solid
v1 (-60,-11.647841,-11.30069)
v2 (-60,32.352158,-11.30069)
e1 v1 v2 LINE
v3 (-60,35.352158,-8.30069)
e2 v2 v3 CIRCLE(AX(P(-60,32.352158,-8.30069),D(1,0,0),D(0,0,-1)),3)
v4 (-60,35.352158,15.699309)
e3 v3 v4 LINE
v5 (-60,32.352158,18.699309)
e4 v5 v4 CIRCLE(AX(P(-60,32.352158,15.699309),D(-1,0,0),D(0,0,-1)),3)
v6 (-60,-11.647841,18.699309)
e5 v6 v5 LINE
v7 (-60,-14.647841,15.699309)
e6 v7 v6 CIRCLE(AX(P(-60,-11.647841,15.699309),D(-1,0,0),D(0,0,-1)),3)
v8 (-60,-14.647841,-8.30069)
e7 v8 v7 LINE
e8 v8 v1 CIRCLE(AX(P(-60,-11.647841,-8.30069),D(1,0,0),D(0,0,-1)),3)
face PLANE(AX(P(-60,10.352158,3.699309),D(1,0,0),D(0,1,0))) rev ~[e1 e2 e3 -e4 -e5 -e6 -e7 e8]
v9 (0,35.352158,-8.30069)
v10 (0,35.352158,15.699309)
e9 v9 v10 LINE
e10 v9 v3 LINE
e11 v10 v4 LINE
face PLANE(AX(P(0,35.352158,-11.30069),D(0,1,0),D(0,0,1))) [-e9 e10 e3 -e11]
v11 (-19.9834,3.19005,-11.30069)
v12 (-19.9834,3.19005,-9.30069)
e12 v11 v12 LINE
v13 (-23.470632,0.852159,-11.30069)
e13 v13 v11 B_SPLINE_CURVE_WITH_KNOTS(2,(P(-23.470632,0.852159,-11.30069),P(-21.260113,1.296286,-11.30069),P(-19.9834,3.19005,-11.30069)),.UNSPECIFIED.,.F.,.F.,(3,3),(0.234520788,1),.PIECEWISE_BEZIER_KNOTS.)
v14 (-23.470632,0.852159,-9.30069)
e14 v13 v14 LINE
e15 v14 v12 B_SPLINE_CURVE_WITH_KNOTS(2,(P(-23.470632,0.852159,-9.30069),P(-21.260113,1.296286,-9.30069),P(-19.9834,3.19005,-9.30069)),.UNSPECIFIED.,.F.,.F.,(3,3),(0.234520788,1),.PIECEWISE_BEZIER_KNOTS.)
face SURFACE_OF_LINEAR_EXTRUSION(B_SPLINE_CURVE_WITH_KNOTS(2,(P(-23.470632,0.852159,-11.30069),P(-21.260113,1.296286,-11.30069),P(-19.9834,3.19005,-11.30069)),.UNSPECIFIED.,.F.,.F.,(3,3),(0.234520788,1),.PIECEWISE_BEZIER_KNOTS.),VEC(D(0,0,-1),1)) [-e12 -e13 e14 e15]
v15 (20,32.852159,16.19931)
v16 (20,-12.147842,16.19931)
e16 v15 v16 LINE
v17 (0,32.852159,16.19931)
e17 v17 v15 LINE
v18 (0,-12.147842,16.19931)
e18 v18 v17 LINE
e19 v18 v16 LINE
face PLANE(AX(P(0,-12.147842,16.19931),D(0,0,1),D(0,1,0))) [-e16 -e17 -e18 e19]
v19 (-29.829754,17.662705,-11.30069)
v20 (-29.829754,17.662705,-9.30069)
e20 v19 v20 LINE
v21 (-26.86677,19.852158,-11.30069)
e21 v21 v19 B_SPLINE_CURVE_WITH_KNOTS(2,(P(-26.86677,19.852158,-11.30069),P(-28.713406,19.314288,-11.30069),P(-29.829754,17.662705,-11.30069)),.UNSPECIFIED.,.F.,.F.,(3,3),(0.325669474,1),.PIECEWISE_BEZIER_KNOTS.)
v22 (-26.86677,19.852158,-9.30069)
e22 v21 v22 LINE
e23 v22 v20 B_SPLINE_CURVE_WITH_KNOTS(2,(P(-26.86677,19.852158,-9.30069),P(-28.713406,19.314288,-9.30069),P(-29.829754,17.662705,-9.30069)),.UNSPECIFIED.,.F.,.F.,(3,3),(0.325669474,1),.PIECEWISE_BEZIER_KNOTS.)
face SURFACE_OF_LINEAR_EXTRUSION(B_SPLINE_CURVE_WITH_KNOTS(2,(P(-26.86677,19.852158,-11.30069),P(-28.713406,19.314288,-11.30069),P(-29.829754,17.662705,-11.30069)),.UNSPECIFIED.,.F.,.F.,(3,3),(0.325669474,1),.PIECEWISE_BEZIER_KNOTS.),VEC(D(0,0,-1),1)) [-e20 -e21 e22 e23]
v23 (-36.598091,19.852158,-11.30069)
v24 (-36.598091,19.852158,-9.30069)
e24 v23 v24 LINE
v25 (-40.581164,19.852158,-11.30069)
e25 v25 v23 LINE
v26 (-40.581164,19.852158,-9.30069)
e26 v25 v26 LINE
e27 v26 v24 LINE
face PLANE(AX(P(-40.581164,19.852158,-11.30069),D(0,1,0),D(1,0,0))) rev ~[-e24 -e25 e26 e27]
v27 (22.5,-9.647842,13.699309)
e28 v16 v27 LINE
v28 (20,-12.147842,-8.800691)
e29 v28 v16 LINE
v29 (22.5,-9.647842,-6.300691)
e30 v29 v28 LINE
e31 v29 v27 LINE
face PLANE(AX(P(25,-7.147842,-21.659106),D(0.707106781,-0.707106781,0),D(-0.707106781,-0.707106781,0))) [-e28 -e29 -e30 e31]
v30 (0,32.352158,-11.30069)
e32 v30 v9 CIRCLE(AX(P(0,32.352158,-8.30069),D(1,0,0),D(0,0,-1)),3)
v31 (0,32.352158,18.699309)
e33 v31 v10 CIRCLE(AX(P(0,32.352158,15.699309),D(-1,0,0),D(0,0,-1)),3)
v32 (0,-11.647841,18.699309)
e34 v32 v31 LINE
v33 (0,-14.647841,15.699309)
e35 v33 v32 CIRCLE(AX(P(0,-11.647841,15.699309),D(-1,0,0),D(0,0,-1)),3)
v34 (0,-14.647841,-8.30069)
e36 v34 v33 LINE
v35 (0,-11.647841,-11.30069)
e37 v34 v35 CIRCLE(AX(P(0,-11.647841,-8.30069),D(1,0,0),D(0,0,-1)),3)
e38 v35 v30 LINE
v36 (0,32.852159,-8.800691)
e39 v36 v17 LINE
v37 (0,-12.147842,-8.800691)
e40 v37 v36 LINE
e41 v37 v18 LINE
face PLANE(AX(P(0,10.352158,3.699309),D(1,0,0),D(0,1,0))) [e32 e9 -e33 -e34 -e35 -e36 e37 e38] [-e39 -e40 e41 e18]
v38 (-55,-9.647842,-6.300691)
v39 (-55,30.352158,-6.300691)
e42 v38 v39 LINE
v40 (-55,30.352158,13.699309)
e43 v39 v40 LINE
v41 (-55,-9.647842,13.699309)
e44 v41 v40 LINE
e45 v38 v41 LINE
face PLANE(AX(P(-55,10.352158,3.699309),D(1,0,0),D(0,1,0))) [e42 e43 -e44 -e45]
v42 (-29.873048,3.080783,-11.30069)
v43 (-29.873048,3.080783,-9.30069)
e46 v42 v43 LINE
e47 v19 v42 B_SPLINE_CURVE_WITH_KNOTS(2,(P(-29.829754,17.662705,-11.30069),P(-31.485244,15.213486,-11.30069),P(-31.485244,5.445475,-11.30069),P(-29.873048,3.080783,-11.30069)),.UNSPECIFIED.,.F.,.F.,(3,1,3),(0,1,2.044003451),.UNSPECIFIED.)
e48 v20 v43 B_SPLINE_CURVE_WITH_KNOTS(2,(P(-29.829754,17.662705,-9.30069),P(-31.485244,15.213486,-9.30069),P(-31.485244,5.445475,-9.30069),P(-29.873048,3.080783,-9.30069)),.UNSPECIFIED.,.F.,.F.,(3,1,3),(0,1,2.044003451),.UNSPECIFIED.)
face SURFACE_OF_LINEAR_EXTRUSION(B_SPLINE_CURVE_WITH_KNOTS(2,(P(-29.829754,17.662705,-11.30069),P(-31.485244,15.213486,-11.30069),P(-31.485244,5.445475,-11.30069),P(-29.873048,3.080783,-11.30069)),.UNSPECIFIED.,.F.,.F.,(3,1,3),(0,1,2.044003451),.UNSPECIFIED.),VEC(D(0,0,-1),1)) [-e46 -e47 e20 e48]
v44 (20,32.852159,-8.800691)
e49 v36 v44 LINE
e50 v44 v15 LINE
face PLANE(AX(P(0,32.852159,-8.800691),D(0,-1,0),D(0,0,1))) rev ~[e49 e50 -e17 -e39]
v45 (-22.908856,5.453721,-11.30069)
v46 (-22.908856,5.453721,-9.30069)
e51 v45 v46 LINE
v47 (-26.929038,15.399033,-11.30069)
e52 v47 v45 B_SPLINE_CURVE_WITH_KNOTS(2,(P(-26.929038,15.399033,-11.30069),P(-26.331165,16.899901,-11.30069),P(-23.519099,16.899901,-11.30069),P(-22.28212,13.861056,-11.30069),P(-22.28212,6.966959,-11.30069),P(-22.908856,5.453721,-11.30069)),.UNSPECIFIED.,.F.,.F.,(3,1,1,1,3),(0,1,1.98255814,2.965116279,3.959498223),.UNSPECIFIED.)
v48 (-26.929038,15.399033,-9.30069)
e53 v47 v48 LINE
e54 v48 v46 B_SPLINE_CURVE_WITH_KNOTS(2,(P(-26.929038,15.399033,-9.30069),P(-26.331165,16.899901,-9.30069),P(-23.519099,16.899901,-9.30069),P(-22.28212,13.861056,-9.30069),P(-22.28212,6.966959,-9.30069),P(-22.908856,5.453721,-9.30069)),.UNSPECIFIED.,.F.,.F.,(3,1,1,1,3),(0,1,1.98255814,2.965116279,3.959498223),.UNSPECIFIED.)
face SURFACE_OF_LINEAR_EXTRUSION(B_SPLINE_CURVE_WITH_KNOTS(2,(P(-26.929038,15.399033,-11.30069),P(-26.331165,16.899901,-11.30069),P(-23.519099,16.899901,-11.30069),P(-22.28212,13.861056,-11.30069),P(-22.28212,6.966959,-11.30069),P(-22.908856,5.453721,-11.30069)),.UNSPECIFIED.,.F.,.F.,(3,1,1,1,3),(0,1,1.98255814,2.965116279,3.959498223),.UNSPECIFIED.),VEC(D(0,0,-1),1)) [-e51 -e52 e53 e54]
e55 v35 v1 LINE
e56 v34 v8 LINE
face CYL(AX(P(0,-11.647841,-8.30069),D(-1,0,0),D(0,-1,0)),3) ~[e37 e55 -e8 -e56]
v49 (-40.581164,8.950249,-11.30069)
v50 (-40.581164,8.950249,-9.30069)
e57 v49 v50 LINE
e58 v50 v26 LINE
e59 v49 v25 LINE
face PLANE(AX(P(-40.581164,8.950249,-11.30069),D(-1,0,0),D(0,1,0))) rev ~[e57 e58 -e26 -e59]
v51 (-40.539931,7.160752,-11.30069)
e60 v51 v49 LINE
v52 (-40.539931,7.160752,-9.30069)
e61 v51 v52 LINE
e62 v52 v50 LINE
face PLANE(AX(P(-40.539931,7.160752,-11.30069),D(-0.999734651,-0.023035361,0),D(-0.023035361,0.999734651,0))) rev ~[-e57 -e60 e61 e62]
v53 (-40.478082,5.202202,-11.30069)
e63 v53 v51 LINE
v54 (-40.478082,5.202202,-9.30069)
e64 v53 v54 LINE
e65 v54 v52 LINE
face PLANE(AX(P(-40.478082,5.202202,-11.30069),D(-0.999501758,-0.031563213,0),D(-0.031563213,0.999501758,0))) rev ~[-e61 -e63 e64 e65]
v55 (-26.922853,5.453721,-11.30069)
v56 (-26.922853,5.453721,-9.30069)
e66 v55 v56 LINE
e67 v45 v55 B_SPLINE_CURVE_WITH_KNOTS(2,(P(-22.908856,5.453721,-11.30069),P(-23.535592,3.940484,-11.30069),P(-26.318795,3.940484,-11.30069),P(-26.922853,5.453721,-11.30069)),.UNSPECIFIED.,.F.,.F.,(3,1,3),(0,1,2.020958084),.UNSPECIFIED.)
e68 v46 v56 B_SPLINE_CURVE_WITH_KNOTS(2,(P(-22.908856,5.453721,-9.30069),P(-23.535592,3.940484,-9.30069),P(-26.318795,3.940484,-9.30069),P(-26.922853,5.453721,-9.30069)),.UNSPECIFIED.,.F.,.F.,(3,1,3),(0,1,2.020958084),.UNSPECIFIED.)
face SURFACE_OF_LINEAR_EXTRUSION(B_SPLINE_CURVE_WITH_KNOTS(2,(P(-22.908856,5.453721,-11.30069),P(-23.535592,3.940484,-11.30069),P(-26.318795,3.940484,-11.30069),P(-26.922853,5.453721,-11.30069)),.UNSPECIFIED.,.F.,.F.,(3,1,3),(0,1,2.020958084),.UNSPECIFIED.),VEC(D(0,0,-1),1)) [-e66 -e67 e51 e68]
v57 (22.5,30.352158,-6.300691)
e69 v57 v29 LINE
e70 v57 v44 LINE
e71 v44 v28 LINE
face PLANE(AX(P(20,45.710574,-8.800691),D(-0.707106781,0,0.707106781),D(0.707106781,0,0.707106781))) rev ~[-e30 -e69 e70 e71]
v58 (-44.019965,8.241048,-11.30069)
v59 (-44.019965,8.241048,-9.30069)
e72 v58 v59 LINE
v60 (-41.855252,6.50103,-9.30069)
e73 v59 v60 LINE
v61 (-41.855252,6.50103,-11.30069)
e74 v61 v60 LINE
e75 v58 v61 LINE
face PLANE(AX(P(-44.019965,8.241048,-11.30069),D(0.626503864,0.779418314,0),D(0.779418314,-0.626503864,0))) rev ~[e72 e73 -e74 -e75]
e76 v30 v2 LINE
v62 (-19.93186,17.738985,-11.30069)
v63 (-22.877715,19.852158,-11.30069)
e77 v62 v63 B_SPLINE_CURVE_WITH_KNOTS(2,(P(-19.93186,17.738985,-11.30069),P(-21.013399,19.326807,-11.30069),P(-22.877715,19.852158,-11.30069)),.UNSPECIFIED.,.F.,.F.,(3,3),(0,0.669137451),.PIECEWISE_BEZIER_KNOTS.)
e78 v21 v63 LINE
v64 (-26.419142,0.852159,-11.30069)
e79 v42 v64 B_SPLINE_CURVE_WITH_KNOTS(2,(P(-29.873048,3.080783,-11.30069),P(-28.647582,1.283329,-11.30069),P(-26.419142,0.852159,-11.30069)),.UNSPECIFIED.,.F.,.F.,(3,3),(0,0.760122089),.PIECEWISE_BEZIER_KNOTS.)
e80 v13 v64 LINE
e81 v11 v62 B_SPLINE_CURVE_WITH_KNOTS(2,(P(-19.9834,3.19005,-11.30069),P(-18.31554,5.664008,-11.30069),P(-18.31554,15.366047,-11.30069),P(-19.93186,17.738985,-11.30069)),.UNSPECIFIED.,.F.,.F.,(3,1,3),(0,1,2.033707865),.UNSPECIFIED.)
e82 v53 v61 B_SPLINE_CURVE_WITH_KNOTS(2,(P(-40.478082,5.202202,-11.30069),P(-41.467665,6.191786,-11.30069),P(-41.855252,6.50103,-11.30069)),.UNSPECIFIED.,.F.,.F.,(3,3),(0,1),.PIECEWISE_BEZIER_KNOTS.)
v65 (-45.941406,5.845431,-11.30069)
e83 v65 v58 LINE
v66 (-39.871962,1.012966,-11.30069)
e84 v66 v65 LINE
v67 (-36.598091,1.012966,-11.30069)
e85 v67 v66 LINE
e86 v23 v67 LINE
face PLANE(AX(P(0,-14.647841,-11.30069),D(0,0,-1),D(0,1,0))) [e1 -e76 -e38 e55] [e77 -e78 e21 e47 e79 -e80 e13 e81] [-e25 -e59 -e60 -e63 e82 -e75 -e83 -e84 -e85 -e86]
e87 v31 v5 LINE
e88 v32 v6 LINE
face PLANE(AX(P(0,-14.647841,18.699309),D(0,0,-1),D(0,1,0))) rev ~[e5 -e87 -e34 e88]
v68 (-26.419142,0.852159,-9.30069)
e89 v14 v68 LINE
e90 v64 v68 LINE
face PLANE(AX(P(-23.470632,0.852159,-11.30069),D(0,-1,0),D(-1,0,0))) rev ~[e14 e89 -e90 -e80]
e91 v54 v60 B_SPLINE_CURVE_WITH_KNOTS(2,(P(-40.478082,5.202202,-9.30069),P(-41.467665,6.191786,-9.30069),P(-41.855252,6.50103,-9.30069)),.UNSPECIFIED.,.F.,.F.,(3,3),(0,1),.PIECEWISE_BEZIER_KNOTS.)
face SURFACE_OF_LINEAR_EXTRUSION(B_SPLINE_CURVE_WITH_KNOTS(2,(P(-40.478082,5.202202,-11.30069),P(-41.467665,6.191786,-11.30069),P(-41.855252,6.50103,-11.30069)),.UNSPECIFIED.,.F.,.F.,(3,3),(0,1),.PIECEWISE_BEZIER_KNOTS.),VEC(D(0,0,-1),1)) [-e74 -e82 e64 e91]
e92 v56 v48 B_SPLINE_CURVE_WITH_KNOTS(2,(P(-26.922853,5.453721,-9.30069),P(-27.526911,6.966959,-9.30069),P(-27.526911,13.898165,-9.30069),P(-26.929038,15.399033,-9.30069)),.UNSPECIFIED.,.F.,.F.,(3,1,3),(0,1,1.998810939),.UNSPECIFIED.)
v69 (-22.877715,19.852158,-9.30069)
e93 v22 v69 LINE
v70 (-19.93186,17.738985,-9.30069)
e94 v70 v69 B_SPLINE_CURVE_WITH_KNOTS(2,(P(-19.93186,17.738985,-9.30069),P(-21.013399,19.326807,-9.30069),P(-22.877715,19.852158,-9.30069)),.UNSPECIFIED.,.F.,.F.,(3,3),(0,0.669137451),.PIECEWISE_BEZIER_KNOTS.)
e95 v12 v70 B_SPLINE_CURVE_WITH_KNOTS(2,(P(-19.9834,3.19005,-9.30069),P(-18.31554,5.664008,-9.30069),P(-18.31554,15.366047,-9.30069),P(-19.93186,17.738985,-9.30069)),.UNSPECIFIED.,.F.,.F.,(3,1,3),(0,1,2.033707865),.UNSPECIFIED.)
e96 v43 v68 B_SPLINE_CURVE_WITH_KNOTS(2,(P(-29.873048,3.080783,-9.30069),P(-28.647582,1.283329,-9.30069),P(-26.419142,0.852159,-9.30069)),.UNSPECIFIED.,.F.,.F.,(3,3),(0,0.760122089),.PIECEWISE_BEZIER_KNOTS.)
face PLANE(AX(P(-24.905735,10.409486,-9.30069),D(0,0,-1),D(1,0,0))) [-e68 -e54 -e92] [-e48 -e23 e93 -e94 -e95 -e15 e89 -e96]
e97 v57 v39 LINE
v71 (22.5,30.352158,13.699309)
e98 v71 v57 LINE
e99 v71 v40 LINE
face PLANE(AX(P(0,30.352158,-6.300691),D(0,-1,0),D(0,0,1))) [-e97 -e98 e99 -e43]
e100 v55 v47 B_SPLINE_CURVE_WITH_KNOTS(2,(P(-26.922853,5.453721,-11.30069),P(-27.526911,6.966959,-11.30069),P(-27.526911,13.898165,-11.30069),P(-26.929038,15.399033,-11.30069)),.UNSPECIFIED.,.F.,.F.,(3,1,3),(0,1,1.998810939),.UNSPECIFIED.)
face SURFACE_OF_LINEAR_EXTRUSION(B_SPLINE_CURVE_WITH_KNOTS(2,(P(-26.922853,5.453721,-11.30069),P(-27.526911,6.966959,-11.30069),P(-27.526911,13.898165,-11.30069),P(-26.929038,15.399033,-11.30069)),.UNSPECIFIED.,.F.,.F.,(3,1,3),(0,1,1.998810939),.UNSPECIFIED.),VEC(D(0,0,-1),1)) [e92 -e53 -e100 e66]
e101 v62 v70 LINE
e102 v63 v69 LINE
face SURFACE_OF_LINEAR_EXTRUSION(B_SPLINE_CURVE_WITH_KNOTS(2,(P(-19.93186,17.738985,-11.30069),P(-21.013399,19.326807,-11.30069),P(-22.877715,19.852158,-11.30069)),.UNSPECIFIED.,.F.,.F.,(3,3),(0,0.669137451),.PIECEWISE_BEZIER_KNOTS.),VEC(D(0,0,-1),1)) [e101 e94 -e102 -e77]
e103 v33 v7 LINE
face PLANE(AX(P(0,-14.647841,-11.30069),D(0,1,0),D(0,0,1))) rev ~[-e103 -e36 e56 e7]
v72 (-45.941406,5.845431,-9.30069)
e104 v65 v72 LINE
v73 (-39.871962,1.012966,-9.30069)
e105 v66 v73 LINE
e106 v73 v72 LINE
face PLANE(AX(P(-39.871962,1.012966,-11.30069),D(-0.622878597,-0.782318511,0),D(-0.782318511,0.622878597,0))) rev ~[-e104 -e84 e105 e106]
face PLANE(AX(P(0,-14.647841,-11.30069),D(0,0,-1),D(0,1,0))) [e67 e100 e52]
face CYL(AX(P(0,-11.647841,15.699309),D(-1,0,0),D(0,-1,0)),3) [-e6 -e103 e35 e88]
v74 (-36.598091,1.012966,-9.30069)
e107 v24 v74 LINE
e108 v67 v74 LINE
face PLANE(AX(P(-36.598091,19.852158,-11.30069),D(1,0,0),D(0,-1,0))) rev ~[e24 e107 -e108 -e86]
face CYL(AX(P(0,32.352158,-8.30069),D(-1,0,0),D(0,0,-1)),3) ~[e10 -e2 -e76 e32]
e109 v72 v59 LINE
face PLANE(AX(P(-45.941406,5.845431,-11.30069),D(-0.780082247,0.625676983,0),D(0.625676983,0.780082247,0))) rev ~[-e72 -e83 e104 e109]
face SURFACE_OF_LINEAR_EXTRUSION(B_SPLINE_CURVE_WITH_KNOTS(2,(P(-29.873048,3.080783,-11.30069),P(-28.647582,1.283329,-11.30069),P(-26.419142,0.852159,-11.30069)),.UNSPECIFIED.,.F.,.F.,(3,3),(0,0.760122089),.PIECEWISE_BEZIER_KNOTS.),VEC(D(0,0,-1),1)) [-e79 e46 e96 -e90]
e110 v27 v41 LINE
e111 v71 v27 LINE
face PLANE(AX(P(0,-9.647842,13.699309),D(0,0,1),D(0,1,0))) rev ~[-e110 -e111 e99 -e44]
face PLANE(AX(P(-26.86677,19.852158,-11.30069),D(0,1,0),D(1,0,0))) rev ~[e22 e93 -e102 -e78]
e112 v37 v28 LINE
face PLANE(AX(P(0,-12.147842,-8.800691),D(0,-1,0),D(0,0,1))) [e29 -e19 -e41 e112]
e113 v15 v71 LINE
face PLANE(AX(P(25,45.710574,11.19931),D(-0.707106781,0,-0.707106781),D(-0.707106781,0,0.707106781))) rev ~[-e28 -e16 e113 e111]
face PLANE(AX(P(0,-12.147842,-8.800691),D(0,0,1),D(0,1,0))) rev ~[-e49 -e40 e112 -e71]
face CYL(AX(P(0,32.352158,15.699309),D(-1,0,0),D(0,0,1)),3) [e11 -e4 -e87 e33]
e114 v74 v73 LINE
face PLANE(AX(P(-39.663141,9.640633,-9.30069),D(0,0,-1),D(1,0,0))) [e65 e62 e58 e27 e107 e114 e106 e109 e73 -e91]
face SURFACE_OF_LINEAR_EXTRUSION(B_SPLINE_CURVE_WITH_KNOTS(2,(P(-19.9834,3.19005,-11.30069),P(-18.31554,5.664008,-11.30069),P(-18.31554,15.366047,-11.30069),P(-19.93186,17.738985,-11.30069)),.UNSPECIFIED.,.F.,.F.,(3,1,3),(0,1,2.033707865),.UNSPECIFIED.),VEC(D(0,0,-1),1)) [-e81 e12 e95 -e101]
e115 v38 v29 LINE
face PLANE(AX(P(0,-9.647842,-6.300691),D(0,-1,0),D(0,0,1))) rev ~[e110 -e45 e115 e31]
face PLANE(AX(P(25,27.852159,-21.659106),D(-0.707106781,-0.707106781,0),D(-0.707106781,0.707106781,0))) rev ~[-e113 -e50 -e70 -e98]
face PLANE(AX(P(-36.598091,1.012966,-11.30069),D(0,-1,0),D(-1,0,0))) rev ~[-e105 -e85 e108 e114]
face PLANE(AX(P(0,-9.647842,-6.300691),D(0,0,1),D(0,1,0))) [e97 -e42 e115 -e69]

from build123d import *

# Parameters (mm, degrees)
F0_W        = 49.9999988824
F0_H        = 29.9999988824
F0_W_2      = 45.0000008941
F0_H_2      = 25.0000008941
F0_W_3      = 40
F0_H_3      = 20
F1_DEPTH    = 60
F2_DEPTH    = 55
F3_DEPTH    = 25
F4_T1_DEPTH = 50.7168307737
F4_T3_DEPTH = 70.7168307737
F5_R        = 3
F7_DEPTH    = 2


# Not quite as in the source:
# - a fillet or chamfer that OpenCascade refuses, or shapes differently, is made with other operations: its cross-section is extruded or revolved along the edge and cut away or added


with BuildPart() as f1:
    # F0 (on Right) → F1 (new body)
    with BuildSketch(Plane.YZ):
        with Locations((10.3521584719, 3.6993094161)):
            Rectangle(F0_W, F0_H)
        with Locations((10.3521584719, 3.6993094161)):
            Rectangle(F0_W_2, F0_H_2, mode=Mode.SUBTRACT)
        with Locations((10.3521584719, 3.6993094161)):
            Rectangle(F0_W_2, F0_H_2)
        with Locations((10.3521584719, 3.6993094161)):
            Rectangle(F0_W_3, F0_H_3, mode=Mode.SUBTRACT)
        with Locations((10.3521584719, 3.6993094161)):
            Rectangle(F0_W_3, F0_H_3)
    extrude(amount=-F1_DEPTH)

    # F0 (on Right) → F2 (cut)
    with BuildSketch(Plane.YZ):
        with Locations((10.3521584719, 3.6993094161)):
            Rectangle(F0_W_3, F0_H_3)
    extrude(amount=-F2_DEPTH, mode=Mode.SUBTRACT)

    # F0 (on Right) → F3 (join)
    with BuildSketch(Plane.YZ):
        with Locations((10.3521584719, 3.6993094161)):
            Rectangle(F0_W_2, F0_H_2)
        with Locations((10.3521584719, 3.6993094161)):
            Rectangle(F0_W_3, F0_H_3, mode=Mode.SUBTRACT)
    extrude(amount=F3_DEPTH)

    # F4: chamfer of 5 on 4 edges, made by hand

    # F4_s2 → F4_t1 (cut)
    with BuildSketch(Plane.XY.offset(-21.6591059707)):
        Polygon((25, -7.1478419751), (20, -12.1478419751), (25, -12.1478419751), align=None)
        Polygon((25, 27.852158919), (20, 32.852158919), (25, 32.852158919), align=None)
    extrude(amount=F4_T1_DEPTH, mode=Mode.SUBTRACT)

    # F4_s4 → F4_t3 (cut)
    with BuildSketch(Plane.XZ.offset(-45.7105738588)):
        Polygon((20, -8.8006910309), (25, -3.8006910309), (25, -8.8006910309), align=None)
        Polygon((25, 11.1993098632), (20, 16.1993098632), (25, 16.1993098632), align=None)
    extrude(amount=F4_T3_DEPTH, mode=Mode.SUBTRACT)

    # F5
    f5_edges = [f1.edges().sort_by_distance(p)[0] for p in [
        (-30, 35.352158, -11.30069),
        (-30, 35.352158, 18.699309),
        (-30, -14.647841, -11.30069),
        (-30, -14.647841, 18.699309),
    ]]
    fillet(f5_edges, radius=F5_R)

    # F6 (on face) → F7 (cut)
    with BuildSketch(Plane(origin=(0, 0, -11.3006900251), x_dir=(1, 0, 0), z_dir=(0, 0, -1))):
        with BuildLine():
            Line((-40.5811635508, -19.8521577269), (-36.5980909465, -19.8521577269))
            Line((-36.5980909465, -19.8521577269), (-36.5980909465, -1.0129664961))
            Line((-36.5980909465, -1.0129664961), (-39.8719622175, -1.0129664961))
            Line((-39.8719622175, -1.0129664961), (-45.941406186, -5.8454313948))
            Line((-45.941406186, -5.8454313948), (-44.0199653644, -8.2410475264))
            Line((-44.0199653644, -8.2410475264), (-41.8552519925, -6.5010303018))
            add(Edge.make_bspline(
                [(-40.4780819617, -5.2022022786), (-41.4676652174, -6.1917855343), (-41.8552519925, -6.5010303018)],
                knots=[0, 0, 0, 1, 1, 1], degree=2))
            Line((-40.4780819617, -5.2022022786), (-40.5399309151, -7.1607524722))
            Line((-40.5399309151, -7.1607524722), (-40.5811635508, -8.9502488597))
            Line((-40.5811635508, -8.9502488597), (-40.5811635508, -19.8521577269))
        make_face()
        with BuildLine():
            Line((-26.8667704258, -19.8521577269), (-22.8777154217, -19.8521577269))
            add(Edge.make_bspline(
                [(-19.9318596147, -17.7389851496), (-21.0133994036, -19.326806957), (-22.8777154217, -19.8521577269)],
                knots=[0, 0, 0, 0.6691374514, 0.6691374514, 0.6691374514], degree=2))
            add(Edge.make_bspline(
                [(-18.315540297, -10.4346237433), (-18.315540297, -15.3660469676), (-19.9318596147, -17.7389851496)],
                knots=[0, 0, 0, 1, 1, 1], degree=2))
            add(Edge.make_bspline(
                [(-19.9834004093, -3.1900496586), (-18.315540297, -5.664007798), (-18.315540297, -10.4346237433)],
                knots=[0, 0, 0, 1, 1, 1], degree=2))
            add(Edge.make_bspline(
                [(-23.4706324827, -0.852159217), (-21.2601126538, -1.2962861316), (-19.9834004093, -3.1900496586)],
                knots=[0.234520788, 0.234520788, 0.234520788, 1, 1, 1], degree=2))
            Line((-23.4706324827, -0.852159217), (-26.4191418917, -0.852159217))
            add(Edge.make_bspline(
                [(-29.8730480712, -3.0807831742), (-28.6475822393, -1.2833288146), (-26.4191418917, -0.852159217)],
                knots=[0, 0, 0, 0.7601220886, 0.7601220886, 0.7601220886], degree=2))
            add(Edge.make_bspline(
                [(-31.4852441253, -10.4346237433), (-31.4852441253, -5.445474829), (-29.8730480712, -3.0807831742)],
                knots=[0, 0, 0, 1, 1, 1], degree=2))
            add(Edge.make_bspline(
                [(-29.8297538037, -17.6627047736), (-31.4852441253, -15.2134862157), (-31.4852441253, -10.4346237433)],
                knots=[0, 0, 0, 1, 1, 1], degree=2))
            add(Edge.make_bspline(
                [(-26.8667704258, -19.8521577269), (-28.7134061438, -19.3142876129), (-29.8297538037, -17.6627047736)],
                knots=[0.3256694736, 0.3256694736, 0.3256694736, 1, 1, 1], degree=2))
        make_face()
        with BuildLine():
            add(Edge.make_bspline(
                [(-27.5269111024, -10.4346237433), (-27.5269111024, -13.8981651383), (-26.9290378854, -15.3990330761)],
                knots=[0, 0, 0, 1, 1, 1], degree=2))
            add(Edge.make_bspline(
                [(-26.92285299, -5.4537213561), (-27.5269111024, -6.9669590847), (-27.5269111024, -10.4346237433)],
                knots=[0, 0, 0, 1, 1, 1], degree=2))
            add(Edge.make_bspline(
                [(-24.9127620019, -3.9404836276), (-26.3187948777, -3.9404836276), (-26.92285299, -5.4537213561)],
                knots=[0, 0, 0, 1, 1, 1], degree=2))
            add(Edge.make_bspline(
                [(-22.908855909, -5.4537213561), (-23.535591971, -3.9404836276), (-24.9127620019, -3.9404836276)],
                knots=[0, 0, 0, 1, 1, 1], degree=2))
            add(Edge.make_bspline(
                [(-22.2821198471, -10.4346237433), (-22.2821198471, -6.9669590847), (-22.908855909, -5.4537213561)],
                knots=[0, 0, 0, 1, 1, 1], degree=2))
            add(Edge.make_bspline(
                [(-22.9006093819, -15.3804783901), (-22.2821198471, -13.8610557662), (-22.2821198471, -10.4346237433)],
                knots=[0, 0, 0, 1, 1, 1], degree=2))
            add(Edge.make_bspline(
                [(-24.9127620019, -16.899901014), (-23.5190989167, -16.899901014), (-22.9006093819, -15.3804783901)],
                knots=[0, 0, 0, 1, 1, 1], degree=2))
            add(Edge.make_bspline(
                [(-26.9290378854, -15.3990330761), (-26.3311646684, -16.899901014), (-24.9127620019, -16.899901014)],
                knots=[0, 0, 0, 1, 1, 1], degree=2))
        make_face(mode=Mode.SUBTRACT)
    extrude(amount=-F7_DEPTH, mode=Mode.SUBTRACT)


solid = f1.part
